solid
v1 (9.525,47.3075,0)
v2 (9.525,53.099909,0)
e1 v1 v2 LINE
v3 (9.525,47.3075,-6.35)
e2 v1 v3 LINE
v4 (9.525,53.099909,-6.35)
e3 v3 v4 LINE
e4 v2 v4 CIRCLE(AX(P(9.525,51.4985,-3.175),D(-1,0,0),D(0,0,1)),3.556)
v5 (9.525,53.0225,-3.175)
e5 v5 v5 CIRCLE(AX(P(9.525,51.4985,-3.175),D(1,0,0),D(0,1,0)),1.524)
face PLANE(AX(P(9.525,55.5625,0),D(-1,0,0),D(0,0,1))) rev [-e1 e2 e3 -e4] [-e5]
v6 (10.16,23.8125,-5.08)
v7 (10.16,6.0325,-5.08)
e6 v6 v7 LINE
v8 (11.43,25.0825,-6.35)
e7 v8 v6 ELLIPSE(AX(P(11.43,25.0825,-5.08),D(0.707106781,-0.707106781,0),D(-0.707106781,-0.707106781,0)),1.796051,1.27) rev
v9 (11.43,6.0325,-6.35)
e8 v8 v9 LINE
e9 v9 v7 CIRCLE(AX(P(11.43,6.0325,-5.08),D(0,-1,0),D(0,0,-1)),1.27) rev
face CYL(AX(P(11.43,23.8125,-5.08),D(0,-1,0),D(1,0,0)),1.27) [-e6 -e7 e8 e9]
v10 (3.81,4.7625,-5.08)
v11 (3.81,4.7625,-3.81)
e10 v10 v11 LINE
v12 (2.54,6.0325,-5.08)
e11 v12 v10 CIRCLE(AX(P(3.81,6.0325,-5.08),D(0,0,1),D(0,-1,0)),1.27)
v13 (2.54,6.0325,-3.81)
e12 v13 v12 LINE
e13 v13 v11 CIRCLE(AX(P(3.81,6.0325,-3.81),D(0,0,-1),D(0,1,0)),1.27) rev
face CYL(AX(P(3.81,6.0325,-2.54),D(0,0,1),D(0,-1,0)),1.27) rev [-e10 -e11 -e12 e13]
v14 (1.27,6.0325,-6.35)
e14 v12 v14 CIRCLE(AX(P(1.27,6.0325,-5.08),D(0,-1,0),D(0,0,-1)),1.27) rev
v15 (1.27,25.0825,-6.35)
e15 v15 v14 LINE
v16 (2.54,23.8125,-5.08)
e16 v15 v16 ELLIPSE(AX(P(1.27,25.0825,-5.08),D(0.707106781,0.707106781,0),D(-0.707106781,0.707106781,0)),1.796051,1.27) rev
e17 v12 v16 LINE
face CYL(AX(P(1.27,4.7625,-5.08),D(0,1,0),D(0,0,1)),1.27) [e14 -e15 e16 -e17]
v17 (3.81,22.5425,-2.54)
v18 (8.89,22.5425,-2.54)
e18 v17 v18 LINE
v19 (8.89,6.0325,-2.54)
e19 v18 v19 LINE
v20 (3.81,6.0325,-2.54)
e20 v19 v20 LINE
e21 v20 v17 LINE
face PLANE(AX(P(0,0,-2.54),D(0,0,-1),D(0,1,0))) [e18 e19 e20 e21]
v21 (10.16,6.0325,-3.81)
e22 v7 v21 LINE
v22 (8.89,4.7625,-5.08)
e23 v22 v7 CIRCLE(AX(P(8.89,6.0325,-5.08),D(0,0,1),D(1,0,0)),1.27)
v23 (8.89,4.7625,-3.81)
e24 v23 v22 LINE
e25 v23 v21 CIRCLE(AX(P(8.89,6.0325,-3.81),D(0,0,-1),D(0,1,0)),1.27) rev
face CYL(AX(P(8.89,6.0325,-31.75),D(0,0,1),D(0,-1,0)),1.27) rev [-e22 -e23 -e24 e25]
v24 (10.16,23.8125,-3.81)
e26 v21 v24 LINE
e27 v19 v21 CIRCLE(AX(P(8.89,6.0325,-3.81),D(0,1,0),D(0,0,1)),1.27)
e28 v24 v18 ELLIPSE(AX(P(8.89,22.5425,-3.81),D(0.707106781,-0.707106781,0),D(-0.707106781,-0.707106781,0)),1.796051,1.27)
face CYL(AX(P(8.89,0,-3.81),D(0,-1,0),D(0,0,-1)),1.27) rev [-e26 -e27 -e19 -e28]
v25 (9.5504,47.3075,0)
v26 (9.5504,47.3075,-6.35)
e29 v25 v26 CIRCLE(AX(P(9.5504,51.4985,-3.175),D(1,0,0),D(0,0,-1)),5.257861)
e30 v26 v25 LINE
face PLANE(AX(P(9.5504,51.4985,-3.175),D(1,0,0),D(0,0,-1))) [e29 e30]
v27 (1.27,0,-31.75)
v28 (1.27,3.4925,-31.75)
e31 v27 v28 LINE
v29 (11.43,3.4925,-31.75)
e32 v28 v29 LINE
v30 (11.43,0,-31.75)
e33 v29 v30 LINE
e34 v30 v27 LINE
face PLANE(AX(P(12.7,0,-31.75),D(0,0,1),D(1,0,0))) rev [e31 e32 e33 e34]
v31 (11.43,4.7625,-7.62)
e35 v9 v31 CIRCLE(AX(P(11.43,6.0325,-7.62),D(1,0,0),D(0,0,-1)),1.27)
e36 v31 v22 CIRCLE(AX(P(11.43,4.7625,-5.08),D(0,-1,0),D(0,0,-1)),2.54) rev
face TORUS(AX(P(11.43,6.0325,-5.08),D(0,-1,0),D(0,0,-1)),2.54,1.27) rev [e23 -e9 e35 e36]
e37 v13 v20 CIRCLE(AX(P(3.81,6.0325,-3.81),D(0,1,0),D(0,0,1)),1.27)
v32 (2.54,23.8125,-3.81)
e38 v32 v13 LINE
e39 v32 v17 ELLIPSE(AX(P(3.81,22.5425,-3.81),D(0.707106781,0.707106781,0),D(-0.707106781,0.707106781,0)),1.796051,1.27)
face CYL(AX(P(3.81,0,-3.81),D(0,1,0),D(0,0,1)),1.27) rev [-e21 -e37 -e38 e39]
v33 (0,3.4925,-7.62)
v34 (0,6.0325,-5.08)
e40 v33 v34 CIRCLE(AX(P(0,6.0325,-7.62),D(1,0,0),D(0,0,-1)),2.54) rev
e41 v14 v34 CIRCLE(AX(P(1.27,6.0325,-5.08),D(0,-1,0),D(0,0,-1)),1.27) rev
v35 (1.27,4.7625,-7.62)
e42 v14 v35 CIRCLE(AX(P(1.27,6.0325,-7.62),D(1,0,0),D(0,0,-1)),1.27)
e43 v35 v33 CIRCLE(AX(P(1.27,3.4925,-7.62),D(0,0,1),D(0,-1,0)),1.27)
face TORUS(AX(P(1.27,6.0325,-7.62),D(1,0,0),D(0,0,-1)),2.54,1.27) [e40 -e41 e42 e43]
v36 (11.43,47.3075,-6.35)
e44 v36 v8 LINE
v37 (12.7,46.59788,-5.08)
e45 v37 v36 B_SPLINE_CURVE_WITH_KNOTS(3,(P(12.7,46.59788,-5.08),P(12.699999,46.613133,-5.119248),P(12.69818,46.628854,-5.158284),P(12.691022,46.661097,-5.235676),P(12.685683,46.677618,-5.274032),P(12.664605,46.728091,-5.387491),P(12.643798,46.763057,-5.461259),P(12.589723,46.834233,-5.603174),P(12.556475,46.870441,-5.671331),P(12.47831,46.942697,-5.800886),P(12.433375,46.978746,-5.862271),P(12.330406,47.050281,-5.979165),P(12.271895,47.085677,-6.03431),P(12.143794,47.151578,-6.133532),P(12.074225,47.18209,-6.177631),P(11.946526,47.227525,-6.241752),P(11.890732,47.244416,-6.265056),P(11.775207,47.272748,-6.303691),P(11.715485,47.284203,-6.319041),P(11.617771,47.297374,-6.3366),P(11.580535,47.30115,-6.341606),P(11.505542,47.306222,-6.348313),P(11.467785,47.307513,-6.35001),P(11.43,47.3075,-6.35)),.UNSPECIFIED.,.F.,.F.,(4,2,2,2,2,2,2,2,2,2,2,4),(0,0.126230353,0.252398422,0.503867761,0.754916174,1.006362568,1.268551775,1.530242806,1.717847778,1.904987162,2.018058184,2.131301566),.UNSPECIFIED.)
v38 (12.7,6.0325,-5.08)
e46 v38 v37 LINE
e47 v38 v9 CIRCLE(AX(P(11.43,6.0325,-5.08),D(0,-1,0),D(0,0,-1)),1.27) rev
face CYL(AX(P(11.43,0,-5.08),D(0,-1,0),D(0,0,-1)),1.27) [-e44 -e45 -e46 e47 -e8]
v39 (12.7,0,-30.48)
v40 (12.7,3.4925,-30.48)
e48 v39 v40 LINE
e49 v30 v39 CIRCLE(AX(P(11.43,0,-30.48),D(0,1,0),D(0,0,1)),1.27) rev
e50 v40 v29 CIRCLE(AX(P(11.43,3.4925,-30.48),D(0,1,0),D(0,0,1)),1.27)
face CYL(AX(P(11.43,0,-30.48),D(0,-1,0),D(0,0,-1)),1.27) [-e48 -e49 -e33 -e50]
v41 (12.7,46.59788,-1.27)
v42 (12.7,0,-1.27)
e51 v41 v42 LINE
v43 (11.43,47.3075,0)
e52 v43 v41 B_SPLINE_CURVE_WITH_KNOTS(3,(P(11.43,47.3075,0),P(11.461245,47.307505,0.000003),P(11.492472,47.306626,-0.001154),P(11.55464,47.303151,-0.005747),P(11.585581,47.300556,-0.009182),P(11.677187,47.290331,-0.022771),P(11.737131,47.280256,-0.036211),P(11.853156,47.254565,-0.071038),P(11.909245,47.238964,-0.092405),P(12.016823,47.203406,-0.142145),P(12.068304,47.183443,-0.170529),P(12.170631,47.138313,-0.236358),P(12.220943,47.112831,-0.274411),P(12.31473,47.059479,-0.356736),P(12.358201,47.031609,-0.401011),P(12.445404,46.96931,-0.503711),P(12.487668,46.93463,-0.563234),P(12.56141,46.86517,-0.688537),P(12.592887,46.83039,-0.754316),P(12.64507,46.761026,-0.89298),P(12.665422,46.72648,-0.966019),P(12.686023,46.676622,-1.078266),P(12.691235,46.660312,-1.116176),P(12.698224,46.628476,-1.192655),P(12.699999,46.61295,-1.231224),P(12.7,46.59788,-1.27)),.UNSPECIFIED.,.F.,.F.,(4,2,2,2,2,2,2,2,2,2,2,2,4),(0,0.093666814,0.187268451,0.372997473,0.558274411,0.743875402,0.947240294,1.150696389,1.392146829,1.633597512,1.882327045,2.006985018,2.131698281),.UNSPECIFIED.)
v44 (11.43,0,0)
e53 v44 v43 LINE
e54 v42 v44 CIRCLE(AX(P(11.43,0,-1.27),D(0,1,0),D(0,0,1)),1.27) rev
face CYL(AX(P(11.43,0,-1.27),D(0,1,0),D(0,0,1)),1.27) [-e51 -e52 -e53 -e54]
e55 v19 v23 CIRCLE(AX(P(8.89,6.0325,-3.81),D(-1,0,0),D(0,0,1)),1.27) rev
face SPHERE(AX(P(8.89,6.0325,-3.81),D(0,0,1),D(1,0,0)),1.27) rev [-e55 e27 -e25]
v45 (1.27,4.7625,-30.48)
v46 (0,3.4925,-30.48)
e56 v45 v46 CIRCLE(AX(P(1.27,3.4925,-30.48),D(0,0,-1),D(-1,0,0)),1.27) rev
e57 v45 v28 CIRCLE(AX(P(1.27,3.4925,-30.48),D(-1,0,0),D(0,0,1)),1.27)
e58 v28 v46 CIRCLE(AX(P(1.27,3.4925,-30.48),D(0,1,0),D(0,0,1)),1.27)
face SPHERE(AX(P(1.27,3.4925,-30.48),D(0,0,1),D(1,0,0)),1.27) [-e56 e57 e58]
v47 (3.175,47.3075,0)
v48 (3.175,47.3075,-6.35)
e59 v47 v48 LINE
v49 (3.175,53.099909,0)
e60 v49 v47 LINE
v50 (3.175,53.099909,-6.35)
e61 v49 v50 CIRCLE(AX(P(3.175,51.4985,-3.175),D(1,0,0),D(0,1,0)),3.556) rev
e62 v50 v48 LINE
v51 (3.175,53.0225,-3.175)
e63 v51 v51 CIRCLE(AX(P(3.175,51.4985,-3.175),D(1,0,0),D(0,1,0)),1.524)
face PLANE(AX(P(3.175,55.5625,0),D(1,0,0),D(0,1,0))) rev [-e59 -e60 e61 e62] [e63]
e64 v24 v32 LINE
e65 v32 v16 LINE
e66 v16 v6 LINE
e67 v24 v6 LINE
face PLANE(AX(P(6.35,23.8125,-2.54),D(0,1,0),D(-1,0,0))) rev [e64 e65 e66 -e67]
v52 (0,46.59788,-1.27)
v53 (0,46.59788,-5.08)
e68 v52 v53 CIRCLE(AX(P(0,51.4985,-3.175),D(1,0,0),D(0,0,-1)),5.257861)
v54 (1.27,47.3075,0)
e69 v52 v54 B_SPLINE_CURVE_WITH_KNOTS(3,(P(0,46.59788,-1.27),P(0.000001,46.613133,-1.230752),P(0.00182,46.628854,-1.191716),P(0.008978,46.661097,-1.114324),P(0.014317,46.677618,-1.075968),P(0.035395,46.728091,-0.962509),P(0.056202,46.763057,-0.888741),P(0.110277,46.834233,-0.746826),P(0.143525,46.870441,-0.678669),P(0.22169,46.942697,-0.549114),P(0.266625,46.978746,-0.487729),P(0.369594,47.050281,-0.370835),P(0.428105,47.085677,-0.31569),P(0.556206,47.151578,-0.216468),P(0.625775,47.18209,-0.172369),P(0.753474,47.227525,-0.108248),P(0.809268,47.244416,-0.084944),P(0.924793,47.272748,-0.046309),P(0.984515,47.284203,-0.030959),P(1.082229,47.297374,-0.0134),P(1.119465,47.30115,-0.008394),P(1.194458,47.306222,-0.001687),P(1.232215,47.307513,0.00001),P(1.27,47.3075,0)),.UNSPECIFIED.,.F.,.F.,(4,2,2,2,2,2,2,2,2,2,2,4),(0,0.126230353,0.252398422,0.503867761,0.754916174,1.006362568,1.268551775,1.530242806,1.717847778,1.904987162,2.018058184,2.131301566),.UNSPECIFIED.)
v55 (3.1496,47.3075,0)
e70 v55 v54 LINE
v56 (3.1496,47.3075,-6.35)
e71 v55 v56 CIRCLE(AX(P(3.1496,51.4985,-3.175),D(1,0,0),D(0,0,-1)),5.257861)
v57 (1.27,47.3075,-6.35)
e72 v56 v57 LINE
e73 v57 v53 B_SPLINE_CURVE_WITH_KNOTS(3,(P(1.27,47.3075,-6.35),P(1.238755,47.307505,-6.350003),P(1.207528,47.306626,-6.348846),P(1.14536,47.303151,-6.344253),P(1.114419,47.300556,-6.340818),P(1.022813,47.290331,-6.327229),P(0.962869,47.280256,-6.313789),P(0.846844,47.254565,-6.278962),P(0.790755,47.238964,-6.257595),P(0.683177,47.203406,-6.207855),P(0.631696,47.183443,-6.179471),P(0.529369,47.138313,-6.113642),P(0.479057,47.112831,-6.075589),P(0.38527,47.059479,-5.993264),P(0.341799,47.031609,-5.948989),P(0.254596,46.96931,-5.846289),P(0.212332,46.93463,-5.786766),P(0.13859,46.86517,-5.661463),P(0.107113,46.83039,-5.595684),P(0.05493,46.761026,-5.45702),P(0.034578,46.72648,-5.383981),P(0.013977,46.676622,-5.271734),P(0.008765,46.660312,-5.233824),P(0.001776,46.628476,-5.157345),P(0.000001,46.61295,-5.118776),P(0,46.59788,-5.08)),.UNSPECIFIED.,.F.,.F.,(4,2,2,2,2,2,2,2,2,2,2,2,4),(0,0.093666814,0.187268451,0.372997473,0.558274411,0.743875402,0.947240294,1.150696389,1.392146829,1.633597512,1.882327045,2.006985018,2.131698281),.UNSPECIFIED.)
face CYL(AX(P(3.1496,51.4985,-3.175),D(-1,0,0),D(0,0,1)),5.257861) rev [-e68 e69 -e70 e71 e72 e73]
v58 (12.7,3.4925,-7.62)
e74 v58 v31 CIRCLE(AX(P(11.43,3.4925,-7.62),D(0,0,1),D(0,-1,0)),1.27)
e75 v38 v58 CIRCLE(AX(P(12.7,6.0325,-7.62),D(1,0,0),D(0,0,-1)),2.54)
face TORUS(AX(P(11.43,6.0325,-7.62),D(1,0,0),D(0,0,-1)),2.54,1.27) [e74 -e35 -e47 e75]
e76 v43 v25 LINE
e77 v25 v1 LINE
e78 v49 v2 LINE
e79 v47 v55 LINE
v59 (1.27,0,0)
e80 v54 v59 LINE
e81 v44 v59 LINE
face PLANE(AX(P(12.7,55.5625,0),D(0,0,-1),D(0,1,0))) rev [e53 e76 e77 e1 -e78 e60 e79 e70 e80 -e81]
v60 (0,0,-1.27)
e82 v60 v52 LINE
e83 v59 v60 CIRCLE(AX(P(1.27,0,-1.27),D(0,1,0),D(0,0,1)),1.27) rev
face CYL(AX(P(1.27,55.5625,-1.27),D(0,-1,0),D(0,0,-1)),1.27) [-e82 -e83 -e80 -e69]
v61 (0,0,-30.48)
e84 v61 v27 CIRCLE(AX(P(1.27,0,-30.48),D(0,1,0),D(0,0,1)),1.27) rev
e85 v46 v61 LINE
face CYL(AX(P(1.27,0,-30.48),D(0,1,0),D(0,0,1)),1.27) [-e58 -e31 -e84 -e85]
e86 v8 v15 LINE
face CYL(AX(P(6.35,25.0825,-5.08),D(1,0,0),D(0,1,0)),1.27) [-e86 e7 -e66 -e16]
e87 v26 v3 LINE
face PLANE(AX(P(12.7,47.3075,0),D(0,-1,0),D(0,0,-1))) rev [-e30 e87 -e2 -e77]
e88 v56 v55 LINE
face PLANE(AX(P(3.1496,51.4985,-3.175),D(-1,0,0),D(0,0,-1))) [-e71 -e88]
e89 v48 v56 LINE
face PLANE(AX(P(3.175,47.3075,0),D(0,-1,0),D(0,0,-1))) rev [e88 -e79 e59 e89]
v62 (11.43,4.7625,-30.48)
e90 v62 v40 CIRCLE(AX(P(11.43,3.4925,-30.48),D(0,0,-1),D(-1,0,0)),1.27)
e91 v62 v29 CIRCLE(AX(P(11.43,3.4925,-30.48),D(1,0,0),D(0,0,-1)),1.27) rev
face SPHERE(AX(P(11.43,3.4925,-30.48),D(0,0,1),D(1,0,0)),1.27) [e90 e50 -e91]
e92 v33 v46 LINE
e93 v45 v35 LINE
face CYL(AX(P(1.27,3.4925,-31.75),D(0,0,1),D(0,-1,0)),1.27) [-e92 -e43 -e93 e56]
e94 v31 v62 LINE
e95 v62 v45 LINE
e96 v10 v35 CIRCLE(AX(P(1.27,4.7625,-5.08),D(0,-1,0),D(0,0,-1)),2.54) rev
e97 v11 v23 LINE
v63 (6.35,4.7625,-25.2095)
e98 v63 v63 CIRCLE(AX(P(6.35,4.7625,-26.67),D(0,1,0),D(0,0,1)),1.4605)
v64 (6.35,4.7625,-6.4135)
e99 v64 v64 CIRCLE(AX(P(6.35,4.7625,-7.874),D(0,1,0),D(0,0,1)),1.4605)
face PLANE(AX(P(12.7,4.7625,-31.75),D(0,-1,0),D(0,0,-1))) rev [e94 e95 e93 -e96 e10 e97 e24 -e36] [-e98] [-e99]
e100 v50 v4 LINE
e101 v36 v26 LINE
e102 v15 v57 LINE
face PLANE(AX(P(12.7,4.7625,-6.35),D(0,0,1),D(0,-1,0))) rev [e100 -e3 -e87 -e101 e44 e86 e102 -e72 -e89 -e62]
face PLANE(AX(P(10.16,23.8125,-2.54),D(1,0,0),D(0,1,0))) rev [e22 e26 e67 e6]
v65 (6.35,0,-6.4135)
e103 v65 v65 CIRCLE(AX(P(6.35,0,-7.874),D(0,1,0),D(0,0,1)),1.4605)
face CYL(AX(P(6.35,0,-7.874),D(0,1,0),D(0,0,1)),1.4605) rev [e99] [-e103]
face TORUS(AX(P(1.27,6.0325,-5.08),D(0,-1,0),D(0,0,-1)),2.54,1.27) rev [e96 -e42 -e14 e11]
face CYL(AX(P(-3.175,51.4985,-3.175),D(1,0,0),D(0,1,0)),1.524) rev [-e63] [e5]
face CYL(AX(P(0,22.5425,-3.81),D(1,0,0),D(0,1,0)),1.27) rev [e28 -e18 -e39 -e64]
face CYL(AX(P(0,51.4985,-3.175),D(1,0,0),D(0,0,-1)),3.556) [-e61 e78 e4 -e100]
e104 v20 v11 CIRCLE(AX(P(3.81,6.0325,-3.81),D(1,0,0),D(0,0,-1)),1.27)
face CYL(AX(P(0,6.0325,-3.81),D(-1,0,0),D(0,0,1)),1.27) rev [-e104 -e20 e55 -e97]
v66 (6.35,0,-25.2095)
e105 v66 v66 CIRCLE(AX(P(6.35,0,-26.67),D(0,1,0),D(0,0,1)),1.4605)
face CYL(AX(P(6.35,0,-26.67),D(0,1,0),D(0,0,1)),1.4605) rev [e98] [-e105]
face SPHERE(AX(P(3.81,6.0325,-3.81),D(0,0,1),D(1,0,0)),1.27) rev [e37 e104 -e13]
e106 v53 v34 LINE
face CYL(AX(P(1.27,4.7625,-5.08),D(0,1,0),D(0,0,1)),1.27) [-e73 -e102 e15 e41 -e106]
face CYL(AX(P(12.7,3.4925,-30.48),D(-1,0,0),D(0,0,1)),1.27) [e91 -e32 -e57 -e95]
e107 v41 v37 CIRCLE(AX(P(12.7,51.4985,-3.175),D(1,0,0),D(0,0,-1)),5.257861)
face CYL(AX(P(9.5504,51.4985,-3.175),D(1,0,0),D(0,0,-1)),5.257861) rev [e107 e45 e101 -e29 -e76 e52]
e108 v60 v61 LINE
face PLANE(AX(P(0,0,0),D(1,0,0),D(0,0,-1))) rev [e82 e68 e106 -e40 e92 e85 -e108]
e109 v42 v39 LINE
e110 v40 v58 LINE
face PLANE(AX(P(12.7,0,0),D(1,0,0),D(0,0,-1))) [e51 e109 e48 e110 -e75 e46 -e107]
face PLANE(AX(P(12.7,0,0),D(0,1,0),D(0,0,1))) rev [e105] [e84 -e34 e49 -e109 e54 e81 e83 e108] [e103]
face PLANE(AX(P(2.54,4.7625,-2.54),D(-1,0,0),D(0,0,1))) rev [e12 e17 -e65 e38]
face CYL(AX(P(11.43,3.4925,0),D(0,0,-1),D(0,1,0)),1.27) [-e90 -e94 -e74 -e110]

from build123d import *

# Parameters (mm, degrees)
BOSS_EXTRUDE1_DEPTH = 12.7
SKETCH4_R           = 1.4605
CUT_EXTRUDE1_DEPTH  = 62.237182332
SKETCH7_W           = 3.175
SKETCH7_H           = 8.255
CUT_EXTRUDE3_DEPTH  = 63.399049722
SKETCH8_R           = 1.524
CUT_EXTRUDE4_DEPTH  = 12.7
CUT_EXTRUDE5_DEPTH  = 3.1496
CUT_EXTRUDE6_DEPTH  = 65.699146295
CUT_EXTRUDE7_DEPTH  = 3.81
FILLET2_R           = 1.27


with BuildPart() as part:
    # Sketch3 → Boss-Extrude1 (new body)
    with BuildSketch(Plane(origin=(0, 0, 0), x_dir=(0, 0, -1), z_dir=(1, 0, 0))):
        Polygon((0, 0), (31.75, 0), (31.75, 4.7625), (6.35, 4.7625), (6.35, 55.5625), (0, 55.5625), align=None)
    extrude(amount=BOSS_EXTRUDE1_DEPTH)

    # Sketch4 → Cut-Extrude1 (cut, through all)
    with BuildSketch(Plane(origin=(0, 4.7625, 0), x_dir=(1, 0, 0), z_dir=(0, 1, 0))):
        with Locations(Location((6.35, 26.67, 0), (0, 0, 270))):
            Circle(SKETCH4_R)
        with Locations(Location((6.35, 7.874, 0), (0, 0, 270))):
            Circle(SKETCH4_R)
    extrude(amount=-CUT_EXTRUDE1_DEPTH, mode=Mode.SUBTRACT)

    # Sketch7 → Cut-Extrude3 (cut, through all)
    with BuildSketch(Plane(origin=(0, 0, -6.35), x_dir=(-1, 0, 0), z_dir=(0, 0, -1))):
        with Locations((-11.1125, 51.435)):
            Rectangle(SKETCH7_W, SKETCH7_H)
        with Locations((-1.5875, 51.435)):
            Rectangle(SKETCH7_W, SKETCH7_H)
    extrude(amount=-CUT_EXTRUDE3_DEPTH, mode=Mode.SUBTRACT)

    # Sketch8 → Cut-Extrude4 (cut)
    with BuildSketch(Plane(origin=(9.525, 0, 0), x_dir=(0, 0, -1), z_dir=(1, 0, 0))):
        with Locations(Location((3.175, 51.4985, 0), (0, 0, 90))):
            Circle(SKETCH8_R)
    extrude(amount=-CUT_EXTRUDE4_DEPTH, mode=Mode.SUBTRACT)

    # Sketch9 → Cut-Extrude5 (cut)
    with BuildSketch(Plane(origin=(12.7, 0, 0), x_dir=(0, 0, -1), z_dir=(1, 0, 0))):
        with BuildLine():
            Line((0, 47.3075), (6.35, 47.3075))
            ThreePointArc((6.35, 47.3075), (3.175, 46.240638648), (0, 47.3075))
        make_face()
    cut_extrude5 = extrude(amount=-CUT_EXTRUDE5_DEPTH, mode=Mode.SUBTRACT)

    # Mirror1: Cut-Extrude5 across plane
    add(cut_extrude5.mirror(Plane(origin=(6.35, 0, 0), x_dir=(0, 0, 1), z_dir=(1, 0, 0))), mode=Mode.SUBTRACT)

    # Sketch10 → Cut-Extrude6 (cut, through all)
    with BuildSketch(Plane(origin=(9.525, 0, 0), x_dir=(0, 0, -1), z_dir=(1, 0, 0))):
        with BuildLine():
            Line((0, 53.099909067), (0, 55.639909067))
            Line((0, 55.639909067), (6.35, 55.639909067))
            Line((6.35, 55.639909067), (6.35, 53.099909067))
            ThreePointArc((6.35, 53.099909067), (3.175, 55.0545), (0, 53.099909067))
        make_face()
    extrude(amount=-CUT_EXTRUDE6_DEPTH, mode=Mode.SUBTRACT)

    # Sketch11 → Cut-Extrude7 (cut)
    with BuildSketch(Plane(origin=(0, 0, -6.35), x_dir=(-1, 0, 0), z_dir=(0, 0, -1))):
        Polygon((-6.35, 23.8125), (-10.16, 23.8125), (-10.16, 4.7625), (-2.54, 4.7625), (-2.54, 23.8125), align=None)
    extrude(amount=-CUT_EXTRUDE7_DEPTH, mode=Mode.SUBTRACT)

    # Fillet2
    fillet2_edges = [part.edges().sort_by_distance(p)[0] for p in [
        (12.7, 2.38125, -31.75),
        (10.16, 4.7625, -4.445),
        (6.35, 23.8125, -2.54),
        (2.54, 14.2875, -6.35),
        (6.35, 23.8125, -6.35),
        (10.16, 14.2875, -6.35),
        (11.43, 4.7625, -6.35),
        (6.35, 4.7625, -31.75),
        (12.7, 4.7625, -19.05),
        (12.7, 26.035, -6.35),
        (12.7, 23.65375, 0),
        (0, 23.65375, 0),
        (0, 26.035, -6.35),
        (0, 4.7625, -19.05),
        (0, 2.38125, -31.75),
        (1.27, 4.7625, -6.35),
        (2.54, 14.2875, -2.54),
        (6.35, 4.7625, -2.54),
        (2.54, 4.7625, -4.445),
        (10.16, 14.2875, -2.54),
    ]]
    fillet(fillet2_edges, radius=FILLET2_R - 0.0001)  # a hair under: the kernel refuses the full size


solid = part.part
